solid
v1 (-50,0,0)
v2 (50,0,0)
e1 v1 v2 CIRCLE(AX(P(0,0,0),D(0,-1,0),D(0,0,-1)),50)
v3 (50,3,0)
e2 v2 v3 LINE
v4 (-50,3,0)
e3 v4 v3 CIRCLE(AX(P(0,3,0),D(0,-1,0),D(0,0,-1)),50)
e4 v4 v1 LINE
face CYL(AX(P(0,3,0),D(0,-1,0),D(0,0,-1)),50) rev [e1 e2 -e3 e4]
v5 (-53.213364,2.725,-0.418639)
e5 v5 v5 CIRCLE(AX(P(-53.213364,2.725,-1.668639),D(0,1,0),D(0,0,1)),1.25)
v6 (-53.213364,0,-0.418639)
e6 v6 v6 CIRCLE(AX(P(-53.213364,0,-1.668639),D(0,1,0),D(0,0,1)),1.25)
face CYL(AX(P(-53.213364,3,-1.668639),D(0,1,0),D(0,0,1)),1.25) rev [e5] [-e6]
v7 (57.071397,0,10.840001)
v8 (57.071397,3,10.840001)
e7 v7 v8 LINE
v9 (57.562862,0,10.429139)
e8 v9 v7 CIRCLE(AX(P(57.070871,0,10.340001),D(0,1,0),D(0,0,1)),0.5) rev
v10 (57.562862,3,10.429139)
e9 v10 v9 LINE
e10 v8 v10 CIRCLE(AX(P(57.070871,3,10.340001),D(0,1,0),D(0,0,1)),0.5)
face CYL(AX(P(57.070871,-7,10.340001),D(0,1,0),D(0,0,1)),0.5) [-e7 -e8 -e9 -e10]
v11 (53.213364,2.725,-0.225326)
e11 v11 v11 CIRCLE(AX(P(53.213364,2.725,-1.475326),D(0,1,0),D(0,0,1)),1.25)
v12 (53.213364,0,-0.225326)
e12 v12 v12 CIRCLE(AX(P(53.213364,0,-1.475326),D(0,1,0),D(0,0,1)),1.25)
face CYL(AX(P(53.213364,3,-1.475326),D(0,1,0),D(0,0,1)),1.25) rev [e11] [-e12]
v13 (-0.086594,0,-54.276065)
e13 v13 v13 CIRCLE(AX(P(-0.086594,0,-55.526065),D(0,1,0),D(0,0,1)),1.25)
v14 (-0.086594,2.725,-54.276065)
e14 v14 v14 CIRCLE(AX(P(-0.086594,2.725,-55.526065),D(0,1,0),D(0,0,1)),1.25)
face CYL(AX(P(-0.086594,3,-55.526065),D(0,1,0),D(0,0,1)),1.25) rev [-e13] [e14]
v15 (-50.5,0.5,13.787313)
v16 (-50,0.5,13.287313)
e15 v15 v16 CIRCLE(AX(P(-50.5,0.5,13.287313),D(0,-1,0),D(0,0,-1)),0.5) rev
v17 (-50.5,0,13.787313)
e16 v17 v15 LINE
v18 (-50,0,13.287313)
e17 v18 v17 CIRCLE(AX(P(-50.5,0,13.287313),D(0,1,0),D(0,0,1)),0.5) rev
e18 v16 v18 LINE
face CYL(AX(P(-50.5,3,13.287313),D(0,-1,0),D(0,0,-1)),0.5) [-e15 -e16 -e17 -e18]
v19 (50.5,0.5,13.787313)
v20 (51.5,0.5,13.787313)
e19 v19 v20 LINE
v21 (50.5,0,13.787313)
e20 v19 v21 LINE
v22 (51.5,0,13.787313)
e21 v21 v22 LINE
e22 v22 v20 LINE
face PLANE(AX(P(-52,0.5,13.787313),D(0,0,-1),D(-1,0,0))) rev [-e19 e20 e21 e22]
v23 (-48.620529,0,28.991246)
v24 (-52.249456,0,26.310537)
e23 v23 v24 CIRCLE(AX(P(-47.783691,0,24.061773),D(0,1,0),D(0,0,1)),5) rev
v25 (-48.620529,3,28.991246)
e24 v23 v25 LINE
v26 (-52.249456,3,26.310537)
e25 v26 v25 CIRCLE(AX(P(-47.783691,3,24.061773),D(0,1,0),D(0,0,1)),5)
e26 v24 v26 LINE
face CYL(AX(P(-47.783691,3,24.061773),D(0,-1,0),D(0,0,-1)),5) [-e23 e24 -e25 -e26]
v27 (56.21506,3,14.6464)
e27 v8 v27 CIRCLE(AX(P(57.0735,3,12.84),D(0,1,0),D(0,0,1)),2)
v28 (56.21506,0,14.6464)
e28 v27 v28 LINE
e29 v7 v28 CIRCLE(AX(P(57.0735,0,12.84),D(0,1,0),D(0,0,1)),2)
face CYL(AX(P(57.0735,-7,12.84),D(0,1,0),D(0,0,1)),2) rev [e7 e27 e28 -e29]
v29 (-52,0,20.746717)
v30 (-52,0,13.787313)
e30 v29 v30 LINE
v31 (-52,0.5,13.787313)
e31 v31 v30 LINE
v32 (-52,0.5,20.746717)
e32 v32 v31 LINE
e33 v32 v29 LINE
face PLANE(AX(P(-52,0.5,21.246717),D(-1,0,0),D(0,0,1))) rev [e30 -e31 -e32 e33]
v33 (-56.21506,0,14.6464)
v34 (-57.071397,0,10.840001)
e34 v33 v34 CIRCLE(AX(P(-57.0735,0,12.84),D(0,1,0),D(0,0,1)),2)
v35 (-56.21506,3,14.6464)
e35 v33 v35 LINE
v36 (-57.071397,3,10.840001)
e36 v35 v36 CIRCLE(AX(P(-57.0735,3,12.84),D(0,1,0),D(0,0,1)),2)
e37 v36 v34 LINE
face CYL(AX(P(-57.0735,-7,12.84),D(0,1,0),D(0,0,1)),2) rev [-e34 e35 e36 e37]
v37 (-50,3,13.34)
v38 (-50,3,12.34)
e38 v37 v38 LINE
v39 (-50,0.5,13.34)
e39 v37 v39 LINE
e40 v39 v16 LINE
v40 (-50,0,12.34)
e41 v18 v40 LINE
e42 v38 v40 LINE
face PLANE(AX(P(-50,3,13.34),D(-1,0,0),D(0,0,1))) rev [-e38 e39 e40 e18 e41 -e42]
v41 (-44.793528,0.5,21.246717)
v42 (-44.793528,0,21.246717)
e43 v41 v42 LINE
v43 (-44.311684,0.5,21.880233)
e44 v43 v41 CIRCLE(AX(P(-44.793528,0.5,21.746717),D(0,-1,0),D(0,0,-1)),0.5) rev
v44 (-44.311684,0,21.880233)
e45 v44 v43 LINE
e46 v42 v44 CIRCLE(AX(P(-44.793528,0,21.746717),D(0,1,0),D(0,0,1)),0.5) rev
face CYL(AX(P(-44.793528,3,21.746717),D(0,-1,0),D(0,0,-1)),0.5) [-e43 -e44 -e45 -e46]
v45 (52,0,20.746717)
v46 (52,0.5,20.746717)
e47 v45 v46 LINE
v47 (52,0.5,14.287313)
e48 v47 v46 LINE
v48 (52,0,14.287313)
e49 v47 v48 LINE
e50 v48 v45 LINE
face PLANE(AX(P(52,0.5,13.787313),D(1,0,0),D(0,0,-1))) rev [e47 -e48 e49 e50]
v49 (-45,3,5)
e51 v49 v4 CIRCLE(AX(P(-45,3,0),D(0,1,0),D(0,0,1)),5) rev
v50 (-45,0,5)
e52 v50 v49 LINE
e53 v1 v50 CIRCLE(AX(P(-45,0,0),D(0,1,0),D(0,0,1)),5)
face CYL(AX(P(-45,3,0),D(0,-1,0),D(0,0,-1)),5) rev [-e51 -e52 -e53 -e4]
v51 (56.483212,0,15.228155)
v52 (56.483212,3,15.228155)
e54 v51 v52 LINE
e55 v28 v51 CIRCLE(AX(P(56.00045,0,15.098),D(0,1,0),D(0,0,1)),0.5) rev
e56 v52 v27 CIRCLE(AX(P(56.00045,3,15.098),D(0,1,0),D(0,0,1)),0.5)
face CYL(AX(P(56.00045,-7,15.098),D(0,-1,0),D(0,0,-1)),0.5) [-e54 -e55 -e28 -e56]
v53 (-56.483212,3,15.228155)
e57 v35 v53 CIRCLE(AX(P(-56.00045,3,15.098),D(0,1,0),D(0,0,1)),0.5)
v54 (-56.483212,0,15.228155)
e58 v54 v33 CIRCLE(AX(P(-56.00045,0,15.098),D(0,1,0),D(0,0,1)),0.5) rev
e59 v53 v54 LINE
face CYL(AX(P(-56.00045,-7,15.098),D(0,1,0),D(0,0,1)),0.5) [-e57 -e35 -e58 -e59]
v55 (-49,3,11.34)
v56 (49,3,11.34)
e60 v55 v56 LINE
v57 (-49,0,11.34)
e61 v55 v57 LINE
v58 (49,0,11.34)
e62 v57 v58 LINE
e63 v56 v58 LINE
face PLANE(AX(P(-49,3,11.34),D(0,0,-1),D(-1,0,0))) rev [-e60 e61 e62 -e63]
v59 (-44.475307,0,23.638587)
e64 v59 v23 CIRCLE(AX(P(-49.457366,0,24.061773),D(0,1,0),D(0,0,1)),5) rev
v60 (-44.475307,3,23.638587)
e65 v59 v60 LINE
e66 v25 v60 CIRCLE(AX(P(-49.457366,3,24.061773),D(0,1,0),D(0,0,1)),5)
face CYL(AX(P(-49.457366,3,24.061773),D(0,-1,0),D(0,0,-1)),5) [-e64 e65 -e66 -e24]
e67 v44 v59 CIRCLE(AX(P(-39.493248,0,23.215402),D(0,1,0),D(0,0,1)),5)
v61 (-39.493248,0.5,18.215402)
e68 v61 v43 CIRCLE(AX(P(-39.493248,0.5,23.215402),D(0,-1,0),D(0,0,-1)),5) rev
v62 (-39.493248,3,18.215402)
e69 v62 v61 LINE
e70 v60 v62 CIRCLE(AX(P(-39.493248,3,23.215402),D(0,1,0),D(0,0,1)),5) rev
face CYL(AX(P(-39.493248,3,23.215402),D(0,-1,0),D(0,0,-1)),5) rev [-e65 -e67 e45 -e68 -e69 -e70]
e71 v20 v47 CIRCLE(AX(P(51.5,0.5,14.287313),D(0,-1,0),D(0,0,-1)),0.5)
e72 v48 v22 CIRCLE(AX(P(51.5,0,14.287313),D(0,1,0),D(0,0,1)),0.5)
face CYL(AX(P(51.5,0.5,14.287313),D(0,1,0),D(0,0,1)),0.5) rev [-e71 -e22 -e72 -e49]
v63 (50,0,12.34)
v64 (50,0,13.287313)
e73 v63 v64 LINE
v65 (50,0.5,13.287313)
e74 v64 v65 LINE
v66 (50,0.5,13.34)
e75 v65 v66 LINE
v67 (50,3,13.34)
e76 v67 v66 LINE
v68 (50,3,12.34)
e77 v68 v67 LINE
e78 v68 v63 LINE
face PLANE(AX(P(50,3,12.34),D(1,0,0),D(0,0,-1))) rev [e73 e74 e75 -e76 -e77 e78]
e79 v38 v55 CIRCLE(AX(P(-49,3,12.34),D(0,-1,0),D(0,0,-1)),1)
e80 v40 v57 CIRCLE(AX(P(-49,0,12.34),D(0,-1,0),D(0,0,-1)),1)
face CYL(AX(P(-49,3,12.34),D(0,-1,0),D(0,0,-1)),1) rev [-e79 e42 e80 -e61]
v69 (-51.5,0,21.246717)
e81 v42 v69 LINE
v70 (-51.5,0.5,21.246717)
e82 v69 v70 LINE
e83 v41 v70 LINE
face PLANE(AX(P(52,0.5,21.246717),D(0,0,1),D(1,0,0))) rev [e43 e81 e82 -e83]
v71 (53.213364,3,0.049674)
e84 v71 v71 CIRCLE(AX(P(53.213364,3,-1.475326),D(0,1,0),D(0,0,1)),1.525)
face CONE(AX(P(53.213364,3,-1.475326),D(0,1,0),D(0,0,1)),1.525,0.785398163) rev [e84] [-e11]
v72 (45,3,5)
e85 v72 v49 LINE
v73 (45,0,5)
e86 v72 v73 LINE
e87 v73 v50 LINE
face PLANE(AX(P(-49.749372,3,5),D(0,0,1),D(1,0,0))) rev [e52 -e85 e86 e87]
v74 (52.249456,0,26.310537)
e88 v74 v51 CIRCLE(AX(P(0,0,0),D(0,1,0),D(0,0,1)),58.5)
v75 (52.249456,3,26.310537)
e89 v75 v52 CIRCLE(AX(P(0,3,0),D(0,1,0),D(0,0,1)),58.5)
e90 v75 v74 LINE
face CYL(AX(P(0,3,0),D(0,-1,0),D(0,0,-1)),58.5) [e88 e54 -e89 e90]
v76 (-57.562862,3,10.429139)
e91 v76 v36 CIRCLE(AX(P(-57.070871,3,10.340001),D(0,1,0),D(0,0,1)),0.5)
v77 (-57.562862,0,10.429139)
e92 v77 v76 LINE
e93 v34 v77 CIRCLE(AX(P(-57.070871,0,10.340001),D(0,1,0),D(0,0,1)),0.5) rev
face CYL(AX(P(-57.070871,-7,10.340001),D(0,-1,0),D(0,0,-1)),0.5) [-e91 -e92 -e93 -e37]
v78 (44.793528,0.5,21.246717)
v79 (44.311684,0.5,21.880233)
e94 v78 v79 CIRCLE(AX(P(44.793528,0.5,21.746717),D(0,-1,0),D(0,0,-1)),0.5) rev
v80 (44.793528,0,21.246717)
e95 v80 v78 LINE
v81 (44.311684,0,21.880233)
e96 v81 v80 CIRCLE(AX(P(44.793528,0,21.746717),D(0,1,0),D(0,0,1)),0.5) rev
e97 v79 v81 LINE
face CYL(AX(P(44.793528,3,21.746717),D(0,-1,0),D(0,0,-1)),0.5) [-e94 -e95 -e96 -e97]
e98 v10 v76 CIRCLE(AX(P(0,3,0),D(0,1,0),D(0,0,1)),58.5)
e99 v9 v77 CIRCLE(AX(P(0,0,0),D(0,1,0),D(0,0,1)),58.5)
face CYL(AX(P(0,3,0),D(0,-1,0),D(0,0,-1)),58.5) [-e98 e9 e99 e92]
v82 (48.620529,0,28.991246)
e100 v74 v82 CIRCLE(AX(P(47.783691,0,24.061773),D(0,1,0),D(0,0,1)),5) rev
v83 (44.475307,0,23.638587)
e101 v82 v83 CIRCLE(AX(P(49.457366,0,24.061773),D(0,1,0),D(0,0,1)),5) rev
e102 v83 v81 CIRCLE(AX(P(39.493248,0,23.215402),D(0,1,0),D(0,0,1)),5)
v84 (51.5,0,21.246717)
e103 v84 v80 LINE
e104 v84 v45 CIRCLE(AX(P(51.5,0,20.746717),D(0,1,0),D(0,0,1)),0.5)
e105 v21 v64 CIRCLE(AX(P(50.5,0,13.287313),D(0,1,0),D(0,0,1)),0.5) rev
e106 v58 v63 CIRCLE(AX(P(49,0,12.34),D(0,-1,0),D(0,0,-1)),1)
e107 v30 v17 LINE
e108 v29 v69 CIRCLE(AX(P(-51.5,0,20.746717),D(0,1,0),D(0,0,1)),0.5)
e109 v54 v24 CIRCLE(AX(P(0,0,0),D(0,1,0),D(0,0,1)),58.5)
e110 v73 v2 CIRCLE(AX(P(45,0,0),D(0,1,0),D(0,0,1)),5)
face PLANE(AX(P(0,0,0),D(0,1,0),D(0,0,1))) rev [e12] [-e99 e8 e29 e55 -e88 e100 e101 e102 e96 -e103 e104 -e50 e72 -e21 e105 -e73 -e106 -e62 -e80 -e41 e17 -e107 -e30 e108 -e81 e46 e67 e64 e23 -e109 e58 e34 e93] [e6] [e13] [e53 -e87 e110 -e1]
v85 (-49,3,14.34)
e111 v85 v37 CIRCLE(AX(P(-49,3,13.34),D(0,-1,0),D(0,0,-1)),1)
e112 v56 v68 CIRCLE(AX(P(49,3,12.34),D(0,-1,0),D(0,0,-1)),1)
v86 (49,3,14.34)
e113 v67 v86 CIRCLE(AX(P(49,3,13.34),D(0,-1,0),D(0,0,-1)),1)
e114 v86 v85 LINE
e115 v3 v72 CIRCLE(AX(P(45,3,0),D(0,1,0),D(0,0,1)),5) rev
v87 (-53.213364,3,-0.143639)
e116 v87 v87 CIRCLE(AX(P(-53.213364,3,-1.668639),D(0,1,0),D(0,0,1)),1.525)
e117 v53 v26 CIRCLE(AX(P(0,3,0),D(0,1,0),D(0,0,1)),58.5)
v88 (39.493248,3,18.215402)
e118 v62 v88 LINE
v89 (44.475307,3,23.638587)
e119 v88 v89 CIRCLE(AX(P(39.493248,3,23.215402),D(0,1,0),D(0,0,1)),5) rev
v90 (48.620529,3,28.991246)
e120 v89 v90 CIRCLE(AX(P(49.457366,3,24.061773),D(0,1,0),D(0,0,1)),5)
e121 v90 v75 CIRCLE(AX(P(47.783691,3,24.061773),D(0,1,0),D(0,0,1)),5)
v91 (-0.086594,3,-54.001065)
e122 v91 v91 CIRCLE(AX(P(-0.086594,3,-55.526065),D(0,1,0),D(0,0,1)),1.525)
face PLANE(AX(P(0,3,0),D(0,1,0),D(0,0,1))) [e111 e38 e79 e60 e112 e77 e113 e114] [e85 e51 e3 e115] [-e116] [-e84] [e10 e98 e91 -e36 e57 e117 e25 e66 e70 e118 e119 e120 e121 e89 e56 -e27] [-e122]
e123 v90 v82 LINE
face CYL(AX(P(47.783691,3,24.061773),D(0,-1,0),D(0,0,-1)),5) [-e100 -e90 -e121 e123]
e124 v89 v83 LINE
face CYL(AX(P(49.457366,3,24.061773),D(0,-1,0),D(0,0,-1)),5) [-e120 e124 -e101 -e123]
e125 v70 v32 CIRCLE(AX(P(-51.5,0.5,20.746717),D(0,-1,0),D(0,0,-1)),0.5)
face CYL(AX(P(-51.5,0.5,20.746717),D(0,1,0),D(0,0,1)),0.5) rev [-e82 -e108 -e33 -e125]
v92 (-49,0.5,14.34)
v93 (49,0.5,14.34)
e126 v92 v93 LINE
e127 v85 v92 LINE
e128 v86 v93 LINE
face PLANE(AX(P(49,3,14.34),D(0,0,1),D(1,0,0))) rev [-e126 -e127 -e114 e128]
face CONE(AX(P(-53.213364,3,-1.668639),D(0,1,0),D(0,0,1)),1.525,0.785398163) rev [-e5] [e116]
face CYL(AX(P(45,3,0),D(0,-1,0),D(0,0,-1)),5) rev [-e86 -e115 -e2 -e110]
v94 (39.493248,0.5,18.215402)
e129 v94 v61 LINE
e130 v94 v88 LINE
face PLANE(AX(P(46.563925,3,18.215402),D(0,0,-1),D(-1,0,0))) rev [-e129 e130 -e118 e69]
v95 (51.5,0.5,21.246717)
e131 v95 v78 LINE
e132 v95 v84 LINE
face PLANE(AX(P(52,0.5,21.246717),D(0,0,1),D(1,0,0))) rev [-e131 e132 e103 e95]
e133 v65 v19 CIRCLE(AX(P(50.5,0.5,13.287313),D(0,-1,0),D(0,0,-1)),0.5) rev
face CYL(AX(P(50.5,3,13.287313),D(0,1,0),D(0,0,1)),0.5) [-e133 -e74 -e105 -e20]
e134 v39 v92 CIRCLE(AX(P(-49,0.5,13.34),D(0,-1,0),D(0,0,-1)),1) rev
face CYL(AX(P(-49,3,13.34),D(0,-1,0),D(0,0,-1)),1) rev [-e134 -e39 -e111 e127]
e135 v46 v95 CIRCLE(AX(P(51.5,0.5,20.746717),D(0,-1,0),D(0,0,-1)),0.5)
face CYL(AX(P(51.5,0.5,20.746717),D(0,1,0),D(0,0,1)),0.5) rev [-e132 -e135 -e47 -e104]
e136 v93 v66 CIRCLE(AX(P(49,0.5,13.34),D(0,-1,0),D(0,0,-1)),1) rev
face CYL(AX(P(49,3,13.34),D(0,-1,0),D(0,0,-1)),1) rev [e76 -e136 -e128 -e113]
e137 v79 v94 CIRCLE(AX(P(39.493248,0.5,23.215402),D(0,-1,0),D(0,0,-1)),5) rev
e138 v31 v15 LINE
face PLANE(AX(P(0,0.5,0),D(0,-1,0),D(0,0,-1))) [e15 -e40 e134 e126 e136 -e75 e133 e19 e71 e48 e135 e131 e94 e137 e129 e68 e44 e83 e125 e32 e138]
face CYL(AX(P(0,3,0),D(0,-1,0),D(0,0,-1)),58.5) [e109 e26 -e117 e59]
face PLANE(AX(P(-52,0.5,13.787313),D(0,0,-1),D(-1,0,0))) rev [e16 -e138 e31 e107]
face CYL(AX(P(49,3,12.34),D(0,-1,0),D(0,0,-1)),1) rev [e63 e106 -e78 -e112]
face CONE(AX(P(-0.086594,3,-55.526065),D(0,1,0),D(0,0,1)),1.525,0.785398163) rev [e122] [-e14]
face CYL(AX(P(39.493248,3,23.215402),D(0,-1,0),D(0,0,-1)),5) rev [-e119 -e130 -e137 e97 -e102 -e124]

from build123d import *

# Parameters (mm, degrees)
SKETCH_2_R                   = 58.5
EXTRUDE_1_DEPTH              = 3
CUT_EXTRUDE_2_DEPTH          = 83.785868359
CUT_EXTRUDE_3_DEPTH          = 83.785868359
SKETCH_5_W                   = 107.181767534
SKETCH_5_H                   = 58.876454488
CUT_EXTRUDE_8_DEPTH          = 83.785868359
FILLET_2_R                   = 5
CUT_EXTRUDE_9_DEPTH          = 83.785868359
FILLET_4_R                   = 5
FILLET_7_R                   = 5
SKETCH_8_W                   = 104
SKETCH_8_H                   = 7.45940389
CUT_EXTRUDE_10_DEPTH         = 0.5
FILLET_8_R                   = 0.5
SKETCH_9_R                   = 2
CUT_EXTRUDE_11_DEPTH         = 10
FILLET_9_R                   = 0.5
HOLE_WIZARD_M3_1_D           = 2.5
HOLE_WIZARD_M3_1_DEPTH       = 3.9
HOLE_WIZARD_M3_1_CSINK_D     = 3.05
HOLE_WIZARD_M3_1_CSINK_ANGLE = 90
HOLE_WIZARD_M3_1_TIP         = 0.751075774


with BuildPart() as part:
    # 草图2 → 凸台-拉伸1 (new body)
    with BuildSketch(Plane(origin=(0, 0, 0), x_dir=(1, 0, 0), z_dir=(0, 1, 0))):
        with Locations(Location((0, 0, 0), (0, 0, 270))):
            Circle(SKETCH_2_R)
    extrude(amount=EXTRUDE_1_DEPTH)

    # 草图3 → 切除-拉伸2 (cut, through all)
    with BuildSketch(Plane.XZ):
        with BuildLine():
            Line((-49.749371855, 5), (49.749371855, 5))
            ThreePointArc((49.749371855, 5), (0, -50), (-49.749371855, 5))
        make_face()
    extrude(amount=-CUT_EXTRUDE_2_DEPTH, mode=Mode.SUBTRACT)

    # 草图4 → 切除-拉伸3 (cut, through all)
    with BuildSketch(Plane(origin=(0, 0, 0), x_dir=(-1, 0, 0), z_dir=(0, -1, 0))):
        with BuildLine():
            Line((-46.56392527, -18.215401819), (46.56392527, -18.215401819))
            ThreePointArc((46.56392527, -18.215401819), (0, -50), (-46.56392527, -18.215401819))
        make_face()
    extrude(amount=-CUT_EXTRUDE_3_DEPTH, mode=Mode.SUBTRACT)

    # 草图5 → 切除-拉伸8 (cut, through all)
    with BuildSketch(Plane(origin=(0, 0, 0), x_dir=(1, 0, 0), z_dir=(0, 1, 0))):
        with Locations((0, -58.5)):
            Rectangle(SKETCH_5_W, SKETCH_5_H)
    extrude(amount=CUT_EXTRUDE_8_DEPTH, mode=Mode.SUBTRACT)

    # 圆角2
    # the kernel refuses this fillet: 5 mm, written as the material it takes off along each edge
    with BuildSketch(Plane(origin=(-50.770693951, 10.80866432, 29.061772756), x_dir=(-0.473436338201062, 0, -0.8808280386492982), z_dir=(0, -1, 0))) as fillet_2_piece_1:
        with BuildLine():
            CenterArc((2.989984287, 4.998217953), FILLET_2_R, 208.257588903, 63.272177489)
            Line((-1.414155907, 2.631036262), (0, 0))
            ThreePointArc((0, 0), (1.561732864, -0.020849951), (3.123465728, 0))
        make_face()
    extrude(amount=18.61732864, mode=Mode.SUBTRACT)
    with BuildSketch(Plane(origin=(50.770693951, 10.80866432, 29.061772756), x_dir=(0.47343633820105957, 0, -0.8808280386492995), z_dir=(0, -1, 0))) as fillet_2_piece_2:
        with BuildLine():
            CenterArc((2.989984287, -4.998217953), FILLET_2_R, 88.470233608, 63.272177489)
            Line((-1.414155907, -2.631036262), (0, 0))
            ThreePointArc((0, 0), (1.561732864, 0.020849951), (3.123465728, 0))
        make_face()
    extrude(amount=18.61732864, mode=Mode.SUBTRACT)
    with BuildSketch(Plane(origin=(-40.686771367, 24.926487598, 29.061772756), x_dir=(-1, 0, 0), z_dir=(0, -1, 0))) as fillet_2_piece_3:
        with BuildLine():
            CenterArc((8.770595039, 5), FILLET_2_R, 154.056362734, 115.943637266)
            ThreePointArc((4.27447082, 7.187433887), (2.287760136, 3.504197713), (0, 0))
            Line((0, 0), (8.770595039, 0))
        make_face()
    extrude(amount=46.852975195, mode=Mode.SUBTRACT)
    with BuildSketch(Plane(origin=(40.686771367, 24.926487598, 29.061772756), x_dir=(1, 0, 0), z_dir=(0, -1, 0))) as fillet_2_piece_4:
        with BuildLine():
            CenterArc((8.770595039, -5), FILLET_2_R, 90, 115.943637266)
            ThreePointArc((4.27447082, -7.187433887), (2.287760136, -3.504197713), (0, 0))
            Line((0, 0), (8.770595039, 0))
        make_face()
    extrude(amount=46.852975195, mode=Mode.SUBTRACT)

    # 草图6 → 切除-拉伸9 (cut, through all)
    with BuildSketch(Plane.XZ):
        with BuildLine():
            Line((-50, 13.34), (-50, 12.34))
            ThreePointArc((-50, 12.34), (-49.707106781, 11.632893219), (-49, 11.34))
            Line((-49, 11.34), (49, 11.34))
            ThreePointArc((49, 11.34), (49.707106781, 11.632893219), (50, 12.34))
            Line((50, 12.34), (50, 13.34))
            ThreePointArc((50, 13.34), (49.707106781, 14.047106781), (49, 14.34))
            Line((49, 14.34), (-49, 14.34))
            ThreePointArc((-49, 14.34), (-49.707106781, 14.047106781), (-50, 13.34))
        make_face()
    extrude(amount=-CUT_EXTRUDE_9_DEPTH, mode=Mode.SUBTRACT)

    # 圆角4
    fillet_4_edges = [part.edges().sort_by_distance(p)[0] for p in [
        (49.749371855, 1.5, 5),
        (-49.749371855, 1.5, 5),
    ]]
    fillet(fillet_4_edges, radius=FILLET_4_R)

    # 圆角7
    fillet_7_edges = [part.edges().sort_by_distance(p)[0] for p in [
        (46.56392527, 1.5, 18.215401819),
        (-46.56392527, 1.5, 18.215401819),
    ]]
    fillet(fillet_7_edges, radius=FILLET_7_R)

    # 草图8 → 切除-拉伸10 (cut)
    with BuildSketch(Plane.XZ):
        with Locations((0, 17.517014665)):
            Rectangle(SKETCH_8_W, SKETCH_8_H)
    extrude(amount=-CUT_EXTRUDE_10_DEPTH, mode=Mode.SUBTRACT)

    # 圆角8
    fillet_8_edges = [part.edges().sort_by_distance(p)[0] for p in [
        (44.089363562, 0.251583272, 21.24671661),
    ]]
    fillet(fillet_8_edges, radius=FILLET_8_R)
    fillet_8_2_edges = [part.edges().sort_by_distance(p)[0] for p in [
        (52, 0.25, 21.24671661),
    ]]
    fillet(fillet_8_2_edges, radius=FILLET_8_R)
    fillet_8_3_edges = [part.edges().sort_by_distance(p)[0] for p in [
        (52, 0.25, 13.78731272),
    ]]
    fillet(fillet_8_3_edges, radius=FILLET_8_R)
    fillet_8_4_edges = [part.edges().sort_by_distance(p)[0] for p in [
        (-52, 0.25, 21.24671661),
    ]]
    fillet(fillet_8_4_edges, radius=FILLET_8_R)
    fillet_8_5_edges = [part.edges().sort_by_distance(p)[0] for p in [
        (-44.089363562, 0.255447628, 21.24671661),
    ]]
    fillet(fillet_8_5_edges, radius=FILLET_8_R)
    # the kernel refuses this fillet: 0.5 mm, written as the material it takes off along each edge
    with BuildSketch(Plane(origin=(49.894377622, 0.5, 13.78731272), x_dir=(0.20668352774517387, 0, -0.9784078491911283), z_dir=(0, -1, 0))) as fillet_8_6_piece_1:
        with BuildLine():
            CenterArc((0.614376094, 0.489203925), FILLET_8_R, 168.071931058, 90)
            Line((0.12517217, 0.592545688), (0.076251777, 0.602879865))
            Line((0.076251777, 0.602879865), (-0.048920392, 0.010334176))
            Line((-0.048920392, 0.010334176), (0.012640058, -0.048375913))
            ThreePointArc((0.012640058, -0.048375913), (0.449150506, -0.0380308), (0.500700154, -0.048920392))
            Line((0.500700154, -0.048920392), (0.51103433, 0))
        make_face()
    extrude(amount=2.014055945, mode=Mode.SUBTRACT)
    # the kernel refuses this fillet: 0.5 mm, written as the material it takes off along each edge
    with BuildSketch(Plane(origin=(-49.894377622, 0.5, 13.78731272), x_dir=(-1, 0, 0), z_dir=(0, -1, 0))) as fillet_8_7_piece_1:
        with BuildLine():
            CenterArc((0.605622378, 0.5), FILLET_8_R, 180, 90)
            Line((0.105622378, 0.5), (0.055622378, 0.5))
            ThreePointArc((0.055622378, 0.5), (0.055622378, 0.44731272), (-0.044718881, 0.022365636))
            Line((-0.044718881, 0.022365636), (0, -0.05))
            Line((0, -0.05), (0.605622378, -0.05))
            Line((0.605622378, -0.05), (0.605622378, 0))
        make_face()
    extrude(amount=2.014055945, mode=Mode.SUBTRACT)

    # 草图9 → 切除-拉伸11 (cut)
    with BuildSketch(Plane(origin=(0, 3, 0), x_dir=(1, 0, 0), z_dir=(0, 1, 0))):
        with Locations((57.07349998, -12.84)):
            Circle(SKETCH_9_R)
        with Locations((-57.07349998, -12.84)):
            Circle(SKETCH_9_R)
    extrude(amount=-CUT_EXTRUDE_11_DEPTH, mode=Mode.SUBTRACT)

    # 圆角9
    fillet_9_edges = [part.edges().sort_by_distance(p)[0] for p in [
        (56.601235389, 1.5, 14.783441832),
        (57.479055827, 1.5, 10.881550497),
        (-57.479055827, 1.5, 10.881550497),
        (-56.601235389, 1.5, 14.783441832),
    ]]
    fillet(fillet_9_edges, radius=FILLET_9_R)

    # M3 螺纹孔1
    with Locations(Plane(origin=(0, 3, 0), x_dir=(1, 0, 0), z_dir=(0, 1, 0))):
        with Locations((53.213363577, 1.475326476), (-53.213363577, 1.668639438), (-0.086594156, 55.526064592), (68.846840655, 52.777963262)):
            CounterSinkHole(HOLE_WIZARD_M3_1_D / 2, HOLE_WIZARD_M3_1_CSINK_D / 2, depth=HOLE_WIZARD_M3_1_DEPTH, counter_sink_angle=HOLE_WIZARD_M3_1_CSINK_ANGLE)
            with Locations((0, 0, -(HOLE_WIZARD_M3_1_DEPTH + HOLE_WIZARD_M3_1_TIP / 2))):  # 118° drill point
                Cone(0, HOLE_WIZARD_M3_1_D / 2, HOLE_WIZARD_M3_1_TIP, mode=Mode.SUBTRACT)


solid = part.part
